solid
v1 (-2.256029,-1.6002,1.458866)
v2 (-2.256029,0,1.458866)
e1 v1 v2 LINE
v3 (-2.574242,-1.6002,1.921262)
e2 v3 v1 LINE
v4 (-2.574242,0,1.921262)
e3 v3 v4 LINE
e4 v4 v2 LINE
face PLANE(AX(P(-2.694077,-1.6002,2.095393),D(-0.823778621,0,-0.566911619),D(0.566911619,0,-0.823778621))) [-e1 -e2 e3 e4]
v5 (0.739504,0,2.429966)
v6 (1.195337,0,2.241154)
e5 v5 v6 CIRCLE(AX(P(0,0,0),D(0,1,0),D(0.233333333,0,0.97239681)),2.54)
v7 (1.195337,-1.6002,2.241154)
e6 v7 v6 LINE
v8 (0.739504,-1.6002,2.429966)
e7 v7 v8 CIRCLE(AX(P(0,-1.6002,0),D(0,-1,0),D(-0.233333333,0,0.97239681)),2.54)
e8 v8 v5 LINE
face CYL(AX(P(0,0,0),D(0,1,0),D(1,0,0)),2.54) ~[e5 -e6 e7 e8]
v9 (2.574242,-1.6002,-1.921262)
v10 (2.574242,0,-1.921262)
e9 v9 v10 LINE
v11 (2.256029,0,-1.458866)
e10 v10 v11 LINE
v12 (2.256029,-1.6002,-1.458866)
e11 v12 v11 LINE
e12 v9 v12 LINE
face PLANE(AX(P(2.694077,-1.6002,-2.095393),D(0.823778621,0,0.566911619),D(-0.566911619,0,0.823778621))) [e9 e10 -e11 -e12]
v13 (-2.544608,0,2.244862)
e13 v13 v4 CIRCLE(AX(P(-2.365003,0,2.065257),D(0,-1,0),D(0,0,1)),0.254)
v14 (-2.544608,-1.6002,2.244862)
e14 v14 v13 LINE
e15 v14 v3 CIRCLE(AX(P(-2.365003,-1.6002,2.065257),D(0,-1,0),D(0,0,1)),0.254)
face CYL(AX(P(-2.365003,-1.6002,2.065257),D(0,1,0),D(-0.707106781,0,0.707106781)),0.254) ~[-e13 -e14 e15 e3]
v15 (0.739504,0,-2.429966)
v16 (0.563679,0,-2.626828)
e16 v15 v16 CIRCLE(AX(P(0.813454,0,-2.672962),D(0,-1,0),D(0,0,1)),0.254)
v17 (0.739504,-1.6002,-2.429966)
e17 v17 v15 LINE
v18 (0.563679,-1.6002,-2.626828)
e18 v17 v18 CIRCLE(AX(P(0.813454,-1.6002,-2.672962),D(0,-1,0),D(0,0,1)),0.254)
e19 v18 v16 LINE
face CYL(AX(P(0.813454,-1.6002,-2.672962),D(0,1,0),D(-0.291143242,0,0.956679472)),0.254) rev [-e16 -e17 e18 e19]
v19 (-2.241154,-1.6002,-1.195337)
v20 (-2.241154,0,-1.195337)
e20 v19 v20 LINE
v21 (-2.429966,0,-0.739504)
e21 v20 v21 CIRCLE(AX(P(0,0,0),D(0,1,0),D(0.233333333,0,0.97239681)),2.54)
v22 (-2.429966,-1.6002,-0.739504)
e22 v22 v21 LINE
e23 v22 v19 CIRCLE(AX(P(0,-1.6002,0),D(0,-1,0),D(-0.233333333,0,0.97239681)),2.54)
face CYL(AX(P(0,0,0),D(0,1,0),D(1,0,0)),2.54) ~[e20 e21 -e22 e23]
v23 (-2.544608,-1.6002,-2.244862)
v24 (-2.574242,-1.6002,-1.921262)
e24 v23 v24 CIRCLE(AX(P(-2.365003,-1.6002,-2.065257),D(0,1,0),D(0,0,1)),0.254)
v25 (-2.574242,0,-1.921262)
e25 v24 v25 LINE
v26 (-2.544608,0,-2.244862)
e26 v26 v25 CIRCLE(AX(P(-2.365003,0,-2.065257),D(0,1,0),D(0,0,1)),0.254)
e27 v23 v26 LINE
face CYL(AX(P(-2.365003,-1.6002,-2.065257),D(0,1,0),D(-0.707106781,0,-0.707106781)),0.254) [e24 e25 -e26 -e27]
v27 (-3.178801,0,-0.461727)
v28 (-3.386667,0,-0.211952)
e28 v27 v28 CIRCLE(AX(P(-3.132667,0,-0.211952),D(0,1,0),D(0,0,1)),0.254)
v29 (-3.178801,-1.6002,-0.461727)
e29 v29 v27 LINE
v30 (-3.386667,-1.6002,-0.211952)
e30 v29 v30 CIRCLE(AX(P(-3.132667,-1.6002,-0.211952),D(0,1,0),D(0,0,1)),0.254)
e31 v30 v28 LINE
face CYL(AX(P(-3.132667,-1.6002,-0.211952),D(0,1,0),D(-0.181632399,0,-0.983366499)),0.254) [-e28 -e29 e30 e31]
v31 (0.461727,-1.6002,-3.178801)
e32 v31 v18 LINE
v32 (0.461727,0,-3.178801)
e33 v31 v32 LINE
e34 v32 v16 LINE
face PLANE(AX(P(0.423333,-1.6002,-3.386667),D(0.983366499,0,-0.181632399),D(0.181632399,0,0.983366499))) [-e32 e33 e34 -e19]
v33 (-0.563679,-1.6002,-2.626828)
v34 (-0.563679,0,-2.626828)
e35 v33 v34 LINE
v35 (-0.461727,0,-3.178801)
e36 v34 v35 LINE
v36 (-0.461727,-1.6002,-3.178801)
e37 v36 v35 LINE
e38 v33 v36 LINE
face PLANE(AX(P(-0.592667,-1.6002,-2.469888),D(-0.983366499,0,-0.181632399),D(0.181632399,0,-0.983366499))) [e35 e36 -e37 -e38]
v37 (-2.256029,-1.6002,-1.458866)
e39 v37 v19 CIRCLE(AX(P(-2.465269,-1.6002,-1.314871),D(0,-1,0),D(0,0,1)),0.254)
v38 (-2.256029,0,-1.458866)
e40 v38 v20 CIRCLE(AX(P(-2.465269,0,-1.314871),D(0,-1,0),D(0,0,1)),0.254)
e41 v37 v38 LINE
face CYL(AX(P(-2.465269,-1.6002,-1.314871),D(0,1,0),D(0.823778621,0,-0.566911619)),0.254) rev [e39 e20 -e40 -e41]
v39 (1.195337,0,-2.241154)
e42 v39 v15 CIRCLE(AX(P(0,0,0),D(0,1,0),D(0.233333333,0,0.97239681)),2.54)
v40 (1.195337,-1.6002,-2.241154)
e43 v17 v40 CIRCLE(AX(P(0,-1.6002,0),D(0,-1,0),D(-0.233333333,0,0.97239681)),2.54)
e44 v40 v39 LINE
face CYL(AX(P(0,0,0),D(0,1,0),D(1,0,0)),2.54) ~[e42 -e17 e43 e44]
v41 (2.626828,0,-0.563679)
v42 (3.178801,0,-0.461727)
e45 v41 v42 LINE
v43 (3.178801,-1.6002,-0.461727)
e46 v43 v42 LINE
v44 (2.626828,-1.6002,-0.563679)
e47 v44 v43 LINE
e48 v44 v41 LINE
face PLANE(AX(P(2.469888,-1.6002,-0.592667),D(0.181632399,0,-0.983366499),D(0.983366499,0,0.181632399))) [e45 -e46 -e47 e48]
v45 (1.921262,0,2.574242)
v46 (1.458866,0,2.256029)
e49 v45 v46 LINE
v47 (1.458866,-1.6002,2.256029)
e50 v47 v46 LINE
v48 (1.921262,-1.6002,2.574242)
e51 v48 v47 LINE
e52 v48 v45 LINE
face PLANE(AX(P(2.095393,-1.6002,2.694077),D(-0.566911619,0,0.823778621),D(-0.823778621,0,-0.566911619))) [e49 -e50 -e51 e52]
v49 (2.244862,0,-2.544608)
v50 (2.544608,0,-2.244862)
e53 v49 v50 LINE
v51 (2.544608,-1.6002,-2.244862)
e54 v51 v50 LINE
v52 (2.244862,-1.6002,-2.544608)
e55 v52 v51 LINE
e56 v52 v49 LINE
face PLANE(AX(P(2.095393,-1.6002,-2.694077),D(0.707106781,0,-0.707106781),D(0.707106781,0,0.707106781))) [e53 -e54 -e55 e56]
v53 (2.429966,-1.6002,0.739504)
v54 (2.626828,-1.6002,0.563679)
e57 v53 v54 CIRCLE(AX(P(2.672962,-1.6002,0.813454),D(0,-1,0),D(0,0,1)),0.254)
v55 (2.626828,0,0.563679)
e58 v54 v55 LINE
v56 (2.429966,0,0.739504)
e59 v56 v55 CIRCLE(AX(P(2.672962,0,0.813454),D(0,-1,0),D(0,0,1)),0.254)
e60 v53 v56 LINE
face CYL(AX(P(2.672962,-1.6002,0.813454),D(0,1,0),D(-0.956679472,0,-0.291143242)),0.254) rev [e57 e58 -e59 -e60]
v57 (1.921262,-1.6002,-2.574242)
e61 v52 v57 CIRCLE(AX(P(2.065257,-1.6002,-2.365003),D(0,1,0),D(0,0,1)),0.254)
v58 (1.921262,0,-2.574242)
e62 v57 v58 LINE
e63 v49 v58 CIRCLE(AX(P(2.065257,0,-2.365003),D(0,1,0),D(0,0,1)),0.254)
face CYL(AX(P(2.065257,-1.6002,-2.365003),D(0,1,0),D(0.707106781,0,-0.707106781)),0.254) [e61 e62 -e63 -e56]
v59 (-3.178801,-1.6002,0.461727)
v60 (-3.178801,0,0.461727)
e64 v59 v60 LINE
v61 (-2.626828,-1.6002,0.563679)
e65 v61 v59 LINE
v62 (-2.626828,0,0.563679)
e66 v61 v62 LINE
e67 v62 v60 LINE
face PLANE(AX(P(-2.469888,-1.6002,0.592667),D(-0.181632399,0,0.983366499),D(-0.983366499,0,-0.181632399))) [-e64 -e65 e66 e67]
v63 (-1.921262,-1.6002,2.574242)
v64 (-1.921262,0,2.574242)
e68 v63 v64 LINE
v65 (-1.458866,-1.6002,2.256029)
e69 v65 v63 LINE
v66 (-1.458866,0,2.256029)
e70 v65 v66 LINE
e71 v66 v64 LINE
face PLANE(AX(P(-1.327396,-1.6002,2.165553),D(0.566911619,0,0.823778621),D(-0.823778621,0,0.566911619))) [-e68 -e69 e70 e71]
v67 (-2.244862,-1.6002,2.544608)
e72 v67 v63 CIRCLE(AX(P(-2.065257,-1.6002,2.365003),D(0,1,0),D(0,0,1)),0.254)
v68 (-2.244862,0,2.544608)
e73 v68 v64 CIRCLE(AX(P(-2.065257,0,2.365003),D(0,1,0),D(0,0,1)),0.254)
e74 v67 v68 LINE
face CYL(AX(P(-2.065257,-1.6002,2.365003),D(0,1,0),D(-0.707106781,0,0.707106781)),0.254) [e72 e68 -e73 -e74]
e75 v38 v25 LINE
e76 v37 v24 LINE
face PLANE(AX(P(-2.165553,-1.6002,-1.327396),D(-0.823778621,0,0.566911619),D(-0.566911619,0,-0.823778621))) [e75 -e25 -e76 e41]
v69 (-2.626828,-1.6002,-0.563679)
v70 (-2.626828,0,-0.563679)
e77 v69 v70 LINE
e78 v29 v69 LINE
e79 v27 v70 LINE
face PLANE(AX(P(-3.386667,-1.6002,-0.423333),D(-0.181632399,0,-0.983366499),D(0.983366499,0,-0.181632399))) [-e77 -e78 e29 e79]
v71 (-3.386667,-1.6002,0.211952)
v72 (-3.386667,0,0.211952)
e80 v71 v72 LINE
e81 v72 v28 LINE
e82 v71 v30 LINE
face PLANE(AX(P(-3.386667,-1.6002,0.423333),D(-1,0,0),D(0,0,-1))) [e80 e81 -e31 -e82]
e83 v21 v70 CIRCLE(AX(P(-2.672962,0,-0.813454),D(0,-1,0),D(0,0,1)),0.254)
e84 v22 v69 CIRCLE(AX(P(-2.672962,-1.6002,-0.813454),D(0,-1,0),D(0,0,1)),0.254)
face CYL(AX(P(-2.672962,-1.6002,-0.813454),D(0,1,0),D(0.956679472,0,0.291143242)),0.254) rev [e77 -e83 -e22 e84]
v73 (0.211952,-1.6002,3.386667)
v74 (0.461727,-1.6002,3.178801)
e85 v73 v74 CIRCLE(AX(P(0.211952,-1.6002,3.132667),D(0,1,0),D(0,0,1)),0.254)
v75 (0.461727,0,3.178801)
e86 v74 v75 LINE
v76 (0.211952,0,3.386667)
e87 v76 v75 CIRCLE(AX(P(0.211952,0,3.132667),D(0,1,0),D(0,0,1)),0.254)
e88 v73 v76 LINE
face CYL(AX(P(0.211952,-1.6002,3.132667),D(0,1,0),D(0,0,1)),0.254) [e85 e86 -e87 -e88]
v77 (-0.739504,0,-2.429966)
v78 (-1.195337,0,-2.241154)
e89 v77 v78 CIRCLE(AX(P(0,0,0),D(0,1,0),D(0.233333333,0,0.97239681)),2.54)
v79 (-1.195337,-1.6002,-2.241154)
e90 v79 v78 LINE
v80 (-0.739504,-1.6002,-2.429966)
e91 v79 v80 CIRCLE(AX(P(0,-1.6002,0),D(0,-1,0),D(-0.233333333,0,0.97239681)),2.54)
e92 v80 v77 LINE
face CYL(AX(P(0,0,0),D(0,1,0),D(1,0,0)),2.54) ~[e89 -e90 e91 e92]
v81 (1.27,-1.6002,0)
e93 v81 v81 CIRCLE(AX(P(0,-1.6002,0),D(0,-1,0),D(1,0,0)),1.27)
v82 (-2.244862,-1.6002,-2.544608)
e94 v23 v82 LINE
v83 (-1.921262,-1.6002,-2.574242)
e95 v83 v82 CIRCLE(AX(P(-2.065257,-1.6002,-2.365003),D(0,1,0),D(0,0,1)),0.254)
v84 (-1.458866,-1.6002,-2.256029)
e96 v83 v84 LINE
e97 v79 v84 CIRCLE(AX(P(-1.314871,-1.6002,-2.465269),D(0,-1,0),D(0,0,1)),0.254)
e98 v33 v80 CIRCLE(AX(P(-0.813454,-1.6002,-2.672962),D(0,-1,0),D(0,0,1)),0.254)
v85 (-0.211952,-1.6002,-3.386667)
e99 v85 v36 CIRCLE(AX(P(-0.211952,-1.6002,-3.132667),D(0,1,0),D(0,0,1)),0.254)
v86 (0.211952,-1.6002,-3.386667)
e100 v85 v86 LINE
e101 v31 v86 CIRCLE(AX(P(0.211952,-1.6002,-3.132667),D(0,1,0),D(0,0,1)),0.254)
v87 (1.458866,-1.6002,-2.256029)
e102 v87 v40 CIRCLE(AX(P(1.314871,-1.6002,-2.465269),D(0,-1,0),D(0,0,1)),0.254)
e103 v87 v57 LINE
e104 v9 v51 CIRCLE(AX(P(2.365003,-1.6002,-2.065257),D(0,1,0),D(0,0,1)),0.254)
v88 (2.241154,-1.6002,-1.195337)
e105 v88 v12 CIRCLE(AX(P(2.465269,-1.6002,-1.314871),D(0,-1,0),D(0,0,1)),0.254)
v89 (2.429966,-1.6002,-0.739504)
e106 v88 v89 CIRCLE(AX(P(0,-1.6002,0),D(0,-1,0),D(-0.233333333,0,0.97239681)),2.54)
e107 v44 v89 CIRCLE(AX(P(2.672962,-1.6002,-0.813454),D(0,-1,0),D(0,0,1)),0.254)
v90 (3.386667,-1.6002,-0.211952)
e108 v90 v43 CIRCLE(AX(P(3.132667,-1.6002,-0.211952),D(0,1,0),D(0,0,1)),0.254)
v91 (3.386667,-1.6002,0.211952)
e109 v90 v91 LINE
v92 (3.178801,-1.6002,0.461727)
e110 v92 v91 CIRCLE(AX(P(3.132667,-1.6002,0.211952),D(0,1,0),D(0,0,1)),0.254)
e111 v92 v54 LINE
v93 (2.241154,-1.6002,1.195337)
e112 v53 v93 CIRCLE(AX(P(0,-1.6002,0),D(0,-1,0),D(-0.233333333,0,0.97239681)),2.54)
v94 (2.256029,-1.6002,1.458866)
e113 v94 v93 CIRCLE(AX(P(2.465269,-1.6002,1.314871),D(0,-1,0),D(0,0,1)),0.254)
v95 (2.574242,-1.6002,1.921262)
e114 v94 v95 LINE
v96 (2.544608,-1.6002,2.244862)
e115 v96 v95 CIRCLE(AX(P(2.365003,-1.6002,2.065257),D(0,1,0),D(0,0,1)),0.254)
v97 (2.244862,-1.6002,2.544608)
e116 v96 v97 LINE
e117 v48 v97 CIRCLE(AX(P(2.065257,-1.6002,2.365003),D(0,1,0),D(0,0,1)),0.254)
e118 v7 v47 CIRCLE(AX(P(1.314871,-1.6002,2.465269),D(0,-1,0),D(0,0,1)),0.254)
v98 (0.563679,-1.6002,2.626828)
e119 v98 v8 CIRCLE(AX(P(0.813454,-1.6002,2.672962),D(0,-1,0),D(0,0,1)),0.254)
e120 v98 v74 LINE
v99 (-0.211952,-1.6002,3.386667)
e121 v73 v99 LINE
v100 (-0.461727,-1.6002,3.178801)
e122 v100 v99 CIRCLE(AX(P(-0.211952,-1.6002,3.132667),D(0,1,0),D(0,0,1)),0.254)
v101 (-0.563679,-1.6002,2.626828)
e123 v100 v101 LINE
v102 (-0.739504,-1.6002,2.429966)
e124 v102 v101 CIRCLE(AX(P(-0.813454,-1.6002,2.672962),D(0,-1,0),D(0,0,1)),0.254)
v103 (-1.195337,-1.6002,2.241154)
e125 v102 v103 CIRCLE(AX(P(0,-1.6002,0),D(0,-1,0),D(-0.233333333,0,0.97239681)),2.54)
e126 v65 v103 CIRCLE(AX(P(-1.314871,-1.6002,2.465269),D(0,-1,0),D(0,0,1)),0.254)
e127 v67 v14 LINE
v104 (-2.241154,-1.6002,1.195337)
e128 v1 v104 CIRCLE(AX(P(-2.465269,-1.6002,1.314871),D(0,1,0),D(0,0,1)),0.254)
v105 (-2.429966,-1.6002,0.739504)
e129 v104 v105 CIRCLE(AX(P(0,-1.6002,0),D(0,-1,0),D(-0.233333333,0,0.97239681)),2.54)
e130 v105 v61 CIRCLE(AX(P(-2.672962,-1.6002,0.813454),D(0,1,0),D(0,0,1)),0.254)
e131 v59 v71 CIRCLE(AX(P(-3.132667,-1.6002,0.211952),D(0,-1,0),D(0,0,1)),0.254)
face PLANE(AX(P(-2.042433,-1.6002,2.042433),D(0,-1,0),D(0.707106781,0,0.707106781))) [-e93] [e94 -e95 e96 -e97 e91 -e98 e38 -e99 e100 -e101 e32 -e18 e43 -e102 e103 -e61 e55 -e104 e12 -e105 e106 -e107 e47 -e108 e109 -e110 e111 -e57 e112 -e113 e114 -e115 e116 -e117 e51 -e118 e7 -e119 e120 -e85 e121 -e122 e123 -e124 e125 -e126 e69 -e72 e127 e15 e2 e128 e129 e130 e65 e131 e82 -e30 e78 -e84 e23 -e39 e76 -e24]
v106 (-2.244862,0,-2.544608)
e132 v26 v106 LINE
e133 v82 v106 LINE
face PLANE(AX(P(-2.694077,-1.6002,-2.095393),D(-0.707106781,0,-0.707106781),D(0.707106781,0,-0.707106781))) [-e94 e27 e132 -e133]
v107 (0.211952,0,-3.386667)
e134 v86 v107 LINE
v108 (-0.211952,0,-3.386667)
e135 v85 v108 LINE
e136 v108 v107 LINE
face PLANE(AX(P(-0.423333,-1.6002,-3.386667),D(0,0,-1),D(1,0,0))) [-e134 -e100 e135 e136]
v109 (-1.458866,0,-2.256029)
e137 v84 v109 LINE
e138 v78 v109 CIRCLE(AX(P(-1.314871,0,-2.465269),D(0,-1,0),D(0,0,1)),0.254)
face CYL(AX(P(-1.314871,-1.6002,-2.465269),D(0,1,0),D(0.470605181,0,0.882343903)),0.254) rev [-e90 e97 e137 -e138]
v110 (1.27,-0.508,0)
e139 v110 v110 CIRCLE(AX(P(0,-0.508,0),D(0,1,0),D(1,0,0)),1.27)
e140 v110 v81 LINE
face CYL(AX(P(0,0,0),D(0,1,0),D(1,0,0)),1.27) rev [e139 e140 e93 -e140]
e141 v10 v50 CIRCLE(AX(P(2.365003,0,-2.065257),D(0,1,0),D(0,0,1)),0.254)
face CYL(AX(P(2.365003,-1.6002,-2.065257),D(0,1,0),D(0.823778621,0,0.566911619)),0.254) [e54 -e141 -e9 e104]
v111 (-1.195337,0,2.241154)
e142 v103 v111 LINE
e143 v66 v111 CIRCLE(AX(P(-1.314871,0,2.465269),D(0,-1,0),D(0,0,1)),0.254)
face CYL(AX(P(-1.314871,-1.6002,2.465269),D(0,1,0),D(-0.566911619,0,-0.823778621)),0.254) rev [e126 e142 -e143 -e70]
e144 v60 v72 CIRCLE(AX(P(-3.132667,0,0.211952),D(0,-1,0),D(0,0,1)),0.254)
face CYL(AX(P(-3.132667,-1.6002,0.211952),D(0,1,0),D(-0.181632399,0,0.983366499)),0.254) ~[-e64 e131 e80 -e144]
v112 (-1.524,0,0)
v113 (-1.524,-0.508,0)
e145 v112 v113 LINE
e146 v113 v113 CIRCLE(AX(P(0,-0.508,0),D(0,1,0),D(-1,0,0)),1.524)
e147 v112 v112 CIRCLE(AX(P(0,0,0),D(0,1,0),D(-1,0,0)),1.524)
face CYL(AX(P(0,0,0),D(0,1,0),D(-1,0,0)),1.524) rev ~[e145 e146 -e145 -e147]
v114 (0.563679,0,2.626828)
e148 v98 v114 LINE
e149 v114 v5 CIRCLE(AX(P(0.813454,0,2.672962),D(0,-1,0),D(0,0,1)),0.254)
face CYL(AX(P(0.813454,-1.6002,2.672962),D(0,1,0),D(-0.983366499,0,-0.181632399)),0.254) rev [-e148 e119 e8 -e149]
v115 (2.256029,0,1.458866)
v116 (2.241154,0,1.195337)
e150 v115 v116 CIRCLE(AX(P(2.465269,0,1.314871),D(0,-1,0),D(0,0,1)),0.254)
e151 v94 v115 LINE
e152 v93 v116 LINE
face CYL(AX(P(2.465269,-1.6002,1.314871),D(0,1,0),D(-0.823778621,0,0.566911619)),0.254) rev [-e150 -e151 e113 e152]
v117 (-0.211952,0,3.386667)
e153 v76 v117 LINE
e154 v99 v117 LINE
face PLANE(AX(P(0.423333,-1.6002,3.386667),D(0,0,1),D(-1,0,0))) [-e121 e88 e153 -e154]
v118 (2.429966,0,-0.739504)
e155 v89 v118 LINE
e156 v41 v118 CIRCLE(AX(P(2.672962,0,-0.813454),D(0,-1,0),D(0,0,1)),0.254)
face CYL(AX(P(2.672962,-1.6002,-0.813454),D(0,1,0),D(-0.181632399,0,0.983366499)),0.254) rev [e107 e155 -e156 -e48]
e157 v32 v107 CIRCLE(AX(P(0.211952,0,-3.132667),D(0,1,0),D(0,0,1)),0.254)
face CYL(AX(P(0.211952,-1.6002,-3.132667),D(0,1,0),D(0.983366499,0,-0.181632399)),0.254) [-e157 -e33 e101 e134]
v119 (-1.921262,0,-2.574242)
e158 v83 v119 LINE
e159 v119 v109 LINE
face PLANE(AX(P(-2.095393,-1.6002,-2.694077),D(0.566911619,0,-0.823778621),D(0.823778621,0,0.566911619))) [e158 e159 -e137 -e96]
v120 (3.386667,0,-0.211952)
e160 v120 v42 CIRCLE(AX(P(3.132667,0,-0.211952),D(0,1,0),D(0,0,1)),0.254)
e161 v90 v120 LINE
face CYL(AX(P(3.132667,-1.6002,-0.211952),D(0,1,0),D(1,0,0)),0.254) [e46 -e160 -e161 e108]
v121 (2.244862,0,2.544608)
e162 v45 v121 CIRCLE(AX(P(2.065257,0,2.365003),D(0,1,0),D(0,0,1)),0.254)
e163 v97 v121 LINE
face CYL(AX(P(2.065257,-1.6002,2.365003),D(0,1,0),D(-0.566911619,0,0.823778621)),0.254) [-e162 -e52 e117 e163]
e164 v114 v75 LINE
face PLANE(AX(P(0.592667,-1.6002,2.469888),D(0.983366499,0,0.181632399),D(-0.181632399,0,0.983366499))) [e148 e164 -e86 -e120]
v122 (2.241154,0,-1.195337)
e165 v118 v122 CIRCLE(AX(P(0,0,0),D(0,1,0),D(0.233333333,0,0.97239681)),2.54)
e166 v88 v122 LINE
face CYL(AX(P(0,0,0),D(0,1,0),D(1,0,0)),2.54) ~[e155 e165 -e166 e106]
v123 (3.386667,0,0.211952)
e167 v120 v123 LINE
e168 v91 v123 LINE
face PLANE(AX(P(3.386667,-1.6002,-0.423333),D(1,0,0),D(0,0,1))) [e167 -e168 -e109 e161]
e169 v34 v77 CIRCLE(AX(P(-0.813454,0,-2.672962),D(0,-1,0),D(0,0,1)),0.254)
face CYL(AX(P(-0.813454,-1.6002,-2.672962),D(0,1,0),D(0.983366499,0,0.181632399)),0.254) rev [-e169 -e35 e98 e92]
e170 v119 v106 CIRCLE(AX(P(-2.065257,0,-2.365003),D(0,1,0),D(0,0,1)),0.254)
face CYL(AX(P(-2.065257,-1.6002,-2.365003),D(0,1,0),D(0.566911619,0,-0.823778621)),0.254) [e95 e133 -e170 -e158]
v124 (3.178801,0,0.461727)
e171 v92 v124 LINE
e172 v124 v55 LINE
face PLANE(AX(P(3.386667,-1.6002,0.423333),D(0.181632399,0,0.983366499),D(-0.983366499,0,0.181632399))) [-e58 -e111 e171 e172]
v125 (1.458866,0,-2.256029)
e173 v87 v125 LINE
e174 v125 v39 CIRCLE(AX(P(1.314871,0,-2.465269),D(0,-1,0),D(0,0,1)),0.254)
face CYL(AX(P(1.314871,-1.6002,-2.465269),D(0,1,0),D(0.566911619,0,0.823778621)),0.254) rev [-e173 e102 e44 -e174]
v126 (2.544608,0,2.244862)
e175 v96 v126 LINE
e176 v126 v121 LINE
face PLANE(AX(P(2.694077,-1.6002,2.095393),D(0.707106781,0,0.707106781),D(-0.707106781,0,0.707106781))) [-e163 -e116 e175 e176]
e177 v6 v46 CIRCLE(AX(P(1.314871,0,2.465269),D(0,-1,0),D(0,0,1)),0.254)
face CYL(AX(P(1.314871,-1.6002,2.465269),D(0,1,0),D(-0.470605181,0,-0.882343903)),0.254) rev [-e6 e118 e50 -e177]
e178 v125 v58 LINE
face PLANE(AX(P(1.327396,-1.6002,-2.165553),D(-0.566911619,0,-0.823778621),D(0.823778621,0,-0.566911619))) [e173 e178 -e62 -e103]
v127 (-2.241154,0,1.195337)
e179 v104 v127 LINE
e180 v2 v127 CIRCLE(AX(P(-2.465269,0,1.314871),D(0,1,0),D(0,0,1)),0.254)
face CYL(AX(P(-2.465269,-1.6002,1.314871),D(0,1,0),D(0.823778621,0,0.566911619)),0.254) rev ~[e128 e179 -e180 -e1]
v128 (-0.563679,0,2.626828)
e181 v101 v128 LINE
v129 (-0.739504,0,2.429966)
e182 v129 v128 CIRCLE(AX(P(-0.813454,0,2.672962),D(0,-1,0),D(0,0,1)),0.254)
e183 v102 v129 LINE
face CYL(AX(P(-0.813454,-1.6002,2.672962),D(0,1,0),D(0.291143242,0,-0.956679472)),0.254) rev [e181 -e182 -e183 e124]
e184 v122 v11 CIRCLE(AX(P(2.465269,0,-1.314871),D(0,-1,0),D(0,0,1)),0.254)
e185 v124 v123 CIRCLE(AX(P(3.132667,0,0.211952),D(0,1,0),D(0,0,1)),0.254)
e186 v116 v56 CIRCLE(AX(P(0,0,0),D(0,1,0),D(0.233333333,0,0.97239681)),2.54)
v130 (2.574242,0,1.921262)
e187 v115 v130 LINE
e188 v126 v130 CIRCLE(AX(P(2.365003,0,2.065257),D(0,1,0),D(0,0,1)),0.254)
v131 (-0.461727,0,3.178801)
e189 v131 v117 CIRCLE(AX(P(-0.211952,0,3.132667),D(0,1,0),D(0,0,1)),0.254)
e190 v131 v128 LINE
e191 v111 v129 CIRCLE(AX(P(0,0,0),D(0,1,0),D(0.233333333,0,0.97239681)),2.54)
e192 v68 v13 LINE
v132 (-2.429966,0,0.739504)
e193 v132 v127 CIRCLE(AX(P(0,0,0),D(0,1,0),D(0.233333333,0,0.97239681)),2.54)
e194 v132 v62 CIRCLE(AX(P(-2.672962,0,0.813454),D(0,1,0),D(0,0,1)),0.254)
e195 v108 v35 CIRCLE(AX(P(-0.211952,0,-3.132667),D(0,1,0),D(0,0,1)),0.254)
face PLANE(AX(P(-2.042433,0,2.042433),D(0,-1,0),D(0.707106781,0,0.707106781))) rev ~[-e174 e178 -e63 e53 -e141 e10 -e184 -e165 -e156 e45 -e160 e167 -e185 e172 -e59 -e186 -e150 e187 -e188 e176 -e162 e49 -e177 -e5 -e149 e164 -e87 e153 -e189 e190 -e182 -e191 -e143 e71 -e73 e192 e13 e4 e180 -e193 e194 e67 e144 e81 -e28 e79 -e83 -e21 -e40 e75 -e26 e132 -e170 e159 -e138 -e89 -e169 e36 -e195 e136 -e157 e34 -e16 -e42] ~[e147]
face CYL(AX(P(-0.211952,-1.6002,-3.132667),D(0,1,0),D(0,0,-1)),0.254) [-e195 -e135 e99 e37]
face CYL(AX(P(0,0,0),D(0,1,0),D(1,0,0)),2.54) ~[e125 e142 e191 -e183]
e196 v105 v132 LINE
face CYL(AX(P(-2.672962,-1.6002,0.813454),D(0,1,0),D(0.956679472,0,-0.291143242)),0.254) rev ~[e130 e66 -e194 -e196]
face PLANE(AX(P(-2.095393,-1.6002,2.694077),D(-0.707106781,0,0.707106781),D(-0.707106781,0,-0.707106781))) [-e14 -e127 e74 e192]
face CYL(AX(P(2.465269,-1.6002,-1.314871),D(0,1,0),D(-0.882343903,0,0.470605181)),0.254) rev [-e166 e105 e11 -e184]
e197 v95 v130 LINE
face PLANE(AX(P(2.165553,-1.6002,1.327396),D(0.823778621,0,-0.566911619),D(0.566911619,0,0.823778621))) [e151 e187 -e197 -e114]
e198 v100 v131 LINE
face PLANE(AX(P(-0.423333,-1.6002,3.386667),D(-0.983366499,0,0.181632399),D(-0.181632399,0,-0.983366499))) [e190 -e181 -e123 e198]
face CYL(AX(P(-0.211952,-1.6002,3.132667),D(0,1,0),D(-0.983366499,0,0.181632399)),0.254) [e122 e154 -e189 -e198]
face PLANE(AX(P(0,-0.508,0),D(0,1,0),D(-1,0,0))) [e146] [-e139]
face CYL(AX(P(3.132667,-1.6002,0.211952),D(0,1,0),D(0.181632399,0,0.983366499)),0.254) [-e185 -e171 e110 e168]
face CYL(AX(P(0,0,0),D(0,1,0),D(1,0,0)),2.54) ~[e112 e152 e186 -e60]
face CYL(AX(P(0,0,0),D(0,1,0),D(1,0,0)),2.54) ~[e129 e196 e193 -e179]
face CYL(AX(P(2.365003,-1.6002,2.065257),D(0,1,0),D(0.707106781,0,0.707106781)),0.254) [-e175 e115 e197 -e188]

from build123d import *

# Parameters (mm, degrees)
F0_R            = 2.54
F0_R_2          = 1.27
F1_DEPTH        = 1.6002
F3_DEPTH        = 1.6002
F3_COPIES_COUNT = 8
F5_R            = 0.254
F6_R            = 1.524
F7_DEPTH        = 0.508


# Not quite as in the source:
# - a pattern or mirror of a feature is missing from the dataset's text; its kind, count and spacing are read off the source's solid


with BuildPart() as f1:
    # F0 (on Front) → F1 (new body)
    with BuildSketch(Plane.XZ):
        Circle(F0_R)
        Circle(F0_R_2, mode=Mode.SUBTRACT)
    extrude(amount=F1_DEPTH)

    # F2 (on face) → F3 (join, through all)
    with BuildSketch(Plane.XZ.offset(1.6002)):
        Polygon((0.4233333333, 3.3866666667), (-0.4233333333, 3.3866666667), (-0.5926666667, 2.4698878967), (0.5926666667, 2.4698878967), align=None)
    f3 = extrude(amount=-F3_DEPTH)

    # F3_copies: F3 ×8 about axis
    f3_copies_axis = Axis((0, 0, 0), (0, 1, 0))
    for i in range(1, F3_COPIES_COUNT):
        add(f3.rotate(f3_copies_axis, i * 360 / F3_COPIES_COUNT))

    # F5
    f5_edges = [f1.edges().sort_by_distance(p)[0] for p in [
        (-0.423333, -0.8001, 3.386667),
        (-0.592667, -0.8001, 2.469888),
        (0.423333, -0.8001, 3.386667),
        (0.592667, -0.8001, 2.469888),
        (-1.327396, -0.8001, 2.165553),
        (-2.095393, -0.8001, 2.694077),
        (2.165553, -0.8001, 1.327396),
        (2.694077, -0.8001, 2.095393),
        (2.469888, -0.8001, 0.592667),
        (3.386667, -0.8001, 0.423333),
        (3.386667, -0.8001, -0.423333),
        (2.469888, -0.8001, -0.592667),
        (2.165553, -0.8001, -1.327396),
        (2.694077, -0.8001, -2.095393),
        (2.095393, -0.8001, -2.694077),
        (1.327396, -0.8001, -2.165553),
        (0.592667, -0.8001, -2.469888),
        (0.423333, -0.8001, -3.386667),
        (-0.423333, -0.8001, -3.386667),
        (-0.592667, -0.8001, -2.469888),
        (-1.327396, -0.8001, -2.165553),
        (-2.095393, -0.8001, -2.694077),
        (-2.694077, -0.8001, -2.095393),
        (-2.165553, -0.8001, -1.327396),
        (-2.469888, -0.8001, -0.592667),
        (-3.386667, -0.8001, -0.423333),
        (-3.386667, -0.8001, 0.423333),
        (-2.469888, -0.8001, 0.592667),
        (-2.165553, -0.8001, 1.327396),
        (1.327396, -0.8001, 2.165553),
        (2.095393, -0.8001, 2.694077),
        (-2.694077, -0.8001, 2.095393),
    ]]
    fillet(f5_edges, radius=F5_R)

    # F6 (on face) → F7 (cut)
    with BuildSketch(Plane(origin=(0, 0, 0), x_dir=(-1, 0, 0), z_dir=(0, 1, 0))):
        Circle(F6_R)
    extrude(amount=-F7_DEPTH, mode=Mode.SUBTRACT)


solid = f1.part
